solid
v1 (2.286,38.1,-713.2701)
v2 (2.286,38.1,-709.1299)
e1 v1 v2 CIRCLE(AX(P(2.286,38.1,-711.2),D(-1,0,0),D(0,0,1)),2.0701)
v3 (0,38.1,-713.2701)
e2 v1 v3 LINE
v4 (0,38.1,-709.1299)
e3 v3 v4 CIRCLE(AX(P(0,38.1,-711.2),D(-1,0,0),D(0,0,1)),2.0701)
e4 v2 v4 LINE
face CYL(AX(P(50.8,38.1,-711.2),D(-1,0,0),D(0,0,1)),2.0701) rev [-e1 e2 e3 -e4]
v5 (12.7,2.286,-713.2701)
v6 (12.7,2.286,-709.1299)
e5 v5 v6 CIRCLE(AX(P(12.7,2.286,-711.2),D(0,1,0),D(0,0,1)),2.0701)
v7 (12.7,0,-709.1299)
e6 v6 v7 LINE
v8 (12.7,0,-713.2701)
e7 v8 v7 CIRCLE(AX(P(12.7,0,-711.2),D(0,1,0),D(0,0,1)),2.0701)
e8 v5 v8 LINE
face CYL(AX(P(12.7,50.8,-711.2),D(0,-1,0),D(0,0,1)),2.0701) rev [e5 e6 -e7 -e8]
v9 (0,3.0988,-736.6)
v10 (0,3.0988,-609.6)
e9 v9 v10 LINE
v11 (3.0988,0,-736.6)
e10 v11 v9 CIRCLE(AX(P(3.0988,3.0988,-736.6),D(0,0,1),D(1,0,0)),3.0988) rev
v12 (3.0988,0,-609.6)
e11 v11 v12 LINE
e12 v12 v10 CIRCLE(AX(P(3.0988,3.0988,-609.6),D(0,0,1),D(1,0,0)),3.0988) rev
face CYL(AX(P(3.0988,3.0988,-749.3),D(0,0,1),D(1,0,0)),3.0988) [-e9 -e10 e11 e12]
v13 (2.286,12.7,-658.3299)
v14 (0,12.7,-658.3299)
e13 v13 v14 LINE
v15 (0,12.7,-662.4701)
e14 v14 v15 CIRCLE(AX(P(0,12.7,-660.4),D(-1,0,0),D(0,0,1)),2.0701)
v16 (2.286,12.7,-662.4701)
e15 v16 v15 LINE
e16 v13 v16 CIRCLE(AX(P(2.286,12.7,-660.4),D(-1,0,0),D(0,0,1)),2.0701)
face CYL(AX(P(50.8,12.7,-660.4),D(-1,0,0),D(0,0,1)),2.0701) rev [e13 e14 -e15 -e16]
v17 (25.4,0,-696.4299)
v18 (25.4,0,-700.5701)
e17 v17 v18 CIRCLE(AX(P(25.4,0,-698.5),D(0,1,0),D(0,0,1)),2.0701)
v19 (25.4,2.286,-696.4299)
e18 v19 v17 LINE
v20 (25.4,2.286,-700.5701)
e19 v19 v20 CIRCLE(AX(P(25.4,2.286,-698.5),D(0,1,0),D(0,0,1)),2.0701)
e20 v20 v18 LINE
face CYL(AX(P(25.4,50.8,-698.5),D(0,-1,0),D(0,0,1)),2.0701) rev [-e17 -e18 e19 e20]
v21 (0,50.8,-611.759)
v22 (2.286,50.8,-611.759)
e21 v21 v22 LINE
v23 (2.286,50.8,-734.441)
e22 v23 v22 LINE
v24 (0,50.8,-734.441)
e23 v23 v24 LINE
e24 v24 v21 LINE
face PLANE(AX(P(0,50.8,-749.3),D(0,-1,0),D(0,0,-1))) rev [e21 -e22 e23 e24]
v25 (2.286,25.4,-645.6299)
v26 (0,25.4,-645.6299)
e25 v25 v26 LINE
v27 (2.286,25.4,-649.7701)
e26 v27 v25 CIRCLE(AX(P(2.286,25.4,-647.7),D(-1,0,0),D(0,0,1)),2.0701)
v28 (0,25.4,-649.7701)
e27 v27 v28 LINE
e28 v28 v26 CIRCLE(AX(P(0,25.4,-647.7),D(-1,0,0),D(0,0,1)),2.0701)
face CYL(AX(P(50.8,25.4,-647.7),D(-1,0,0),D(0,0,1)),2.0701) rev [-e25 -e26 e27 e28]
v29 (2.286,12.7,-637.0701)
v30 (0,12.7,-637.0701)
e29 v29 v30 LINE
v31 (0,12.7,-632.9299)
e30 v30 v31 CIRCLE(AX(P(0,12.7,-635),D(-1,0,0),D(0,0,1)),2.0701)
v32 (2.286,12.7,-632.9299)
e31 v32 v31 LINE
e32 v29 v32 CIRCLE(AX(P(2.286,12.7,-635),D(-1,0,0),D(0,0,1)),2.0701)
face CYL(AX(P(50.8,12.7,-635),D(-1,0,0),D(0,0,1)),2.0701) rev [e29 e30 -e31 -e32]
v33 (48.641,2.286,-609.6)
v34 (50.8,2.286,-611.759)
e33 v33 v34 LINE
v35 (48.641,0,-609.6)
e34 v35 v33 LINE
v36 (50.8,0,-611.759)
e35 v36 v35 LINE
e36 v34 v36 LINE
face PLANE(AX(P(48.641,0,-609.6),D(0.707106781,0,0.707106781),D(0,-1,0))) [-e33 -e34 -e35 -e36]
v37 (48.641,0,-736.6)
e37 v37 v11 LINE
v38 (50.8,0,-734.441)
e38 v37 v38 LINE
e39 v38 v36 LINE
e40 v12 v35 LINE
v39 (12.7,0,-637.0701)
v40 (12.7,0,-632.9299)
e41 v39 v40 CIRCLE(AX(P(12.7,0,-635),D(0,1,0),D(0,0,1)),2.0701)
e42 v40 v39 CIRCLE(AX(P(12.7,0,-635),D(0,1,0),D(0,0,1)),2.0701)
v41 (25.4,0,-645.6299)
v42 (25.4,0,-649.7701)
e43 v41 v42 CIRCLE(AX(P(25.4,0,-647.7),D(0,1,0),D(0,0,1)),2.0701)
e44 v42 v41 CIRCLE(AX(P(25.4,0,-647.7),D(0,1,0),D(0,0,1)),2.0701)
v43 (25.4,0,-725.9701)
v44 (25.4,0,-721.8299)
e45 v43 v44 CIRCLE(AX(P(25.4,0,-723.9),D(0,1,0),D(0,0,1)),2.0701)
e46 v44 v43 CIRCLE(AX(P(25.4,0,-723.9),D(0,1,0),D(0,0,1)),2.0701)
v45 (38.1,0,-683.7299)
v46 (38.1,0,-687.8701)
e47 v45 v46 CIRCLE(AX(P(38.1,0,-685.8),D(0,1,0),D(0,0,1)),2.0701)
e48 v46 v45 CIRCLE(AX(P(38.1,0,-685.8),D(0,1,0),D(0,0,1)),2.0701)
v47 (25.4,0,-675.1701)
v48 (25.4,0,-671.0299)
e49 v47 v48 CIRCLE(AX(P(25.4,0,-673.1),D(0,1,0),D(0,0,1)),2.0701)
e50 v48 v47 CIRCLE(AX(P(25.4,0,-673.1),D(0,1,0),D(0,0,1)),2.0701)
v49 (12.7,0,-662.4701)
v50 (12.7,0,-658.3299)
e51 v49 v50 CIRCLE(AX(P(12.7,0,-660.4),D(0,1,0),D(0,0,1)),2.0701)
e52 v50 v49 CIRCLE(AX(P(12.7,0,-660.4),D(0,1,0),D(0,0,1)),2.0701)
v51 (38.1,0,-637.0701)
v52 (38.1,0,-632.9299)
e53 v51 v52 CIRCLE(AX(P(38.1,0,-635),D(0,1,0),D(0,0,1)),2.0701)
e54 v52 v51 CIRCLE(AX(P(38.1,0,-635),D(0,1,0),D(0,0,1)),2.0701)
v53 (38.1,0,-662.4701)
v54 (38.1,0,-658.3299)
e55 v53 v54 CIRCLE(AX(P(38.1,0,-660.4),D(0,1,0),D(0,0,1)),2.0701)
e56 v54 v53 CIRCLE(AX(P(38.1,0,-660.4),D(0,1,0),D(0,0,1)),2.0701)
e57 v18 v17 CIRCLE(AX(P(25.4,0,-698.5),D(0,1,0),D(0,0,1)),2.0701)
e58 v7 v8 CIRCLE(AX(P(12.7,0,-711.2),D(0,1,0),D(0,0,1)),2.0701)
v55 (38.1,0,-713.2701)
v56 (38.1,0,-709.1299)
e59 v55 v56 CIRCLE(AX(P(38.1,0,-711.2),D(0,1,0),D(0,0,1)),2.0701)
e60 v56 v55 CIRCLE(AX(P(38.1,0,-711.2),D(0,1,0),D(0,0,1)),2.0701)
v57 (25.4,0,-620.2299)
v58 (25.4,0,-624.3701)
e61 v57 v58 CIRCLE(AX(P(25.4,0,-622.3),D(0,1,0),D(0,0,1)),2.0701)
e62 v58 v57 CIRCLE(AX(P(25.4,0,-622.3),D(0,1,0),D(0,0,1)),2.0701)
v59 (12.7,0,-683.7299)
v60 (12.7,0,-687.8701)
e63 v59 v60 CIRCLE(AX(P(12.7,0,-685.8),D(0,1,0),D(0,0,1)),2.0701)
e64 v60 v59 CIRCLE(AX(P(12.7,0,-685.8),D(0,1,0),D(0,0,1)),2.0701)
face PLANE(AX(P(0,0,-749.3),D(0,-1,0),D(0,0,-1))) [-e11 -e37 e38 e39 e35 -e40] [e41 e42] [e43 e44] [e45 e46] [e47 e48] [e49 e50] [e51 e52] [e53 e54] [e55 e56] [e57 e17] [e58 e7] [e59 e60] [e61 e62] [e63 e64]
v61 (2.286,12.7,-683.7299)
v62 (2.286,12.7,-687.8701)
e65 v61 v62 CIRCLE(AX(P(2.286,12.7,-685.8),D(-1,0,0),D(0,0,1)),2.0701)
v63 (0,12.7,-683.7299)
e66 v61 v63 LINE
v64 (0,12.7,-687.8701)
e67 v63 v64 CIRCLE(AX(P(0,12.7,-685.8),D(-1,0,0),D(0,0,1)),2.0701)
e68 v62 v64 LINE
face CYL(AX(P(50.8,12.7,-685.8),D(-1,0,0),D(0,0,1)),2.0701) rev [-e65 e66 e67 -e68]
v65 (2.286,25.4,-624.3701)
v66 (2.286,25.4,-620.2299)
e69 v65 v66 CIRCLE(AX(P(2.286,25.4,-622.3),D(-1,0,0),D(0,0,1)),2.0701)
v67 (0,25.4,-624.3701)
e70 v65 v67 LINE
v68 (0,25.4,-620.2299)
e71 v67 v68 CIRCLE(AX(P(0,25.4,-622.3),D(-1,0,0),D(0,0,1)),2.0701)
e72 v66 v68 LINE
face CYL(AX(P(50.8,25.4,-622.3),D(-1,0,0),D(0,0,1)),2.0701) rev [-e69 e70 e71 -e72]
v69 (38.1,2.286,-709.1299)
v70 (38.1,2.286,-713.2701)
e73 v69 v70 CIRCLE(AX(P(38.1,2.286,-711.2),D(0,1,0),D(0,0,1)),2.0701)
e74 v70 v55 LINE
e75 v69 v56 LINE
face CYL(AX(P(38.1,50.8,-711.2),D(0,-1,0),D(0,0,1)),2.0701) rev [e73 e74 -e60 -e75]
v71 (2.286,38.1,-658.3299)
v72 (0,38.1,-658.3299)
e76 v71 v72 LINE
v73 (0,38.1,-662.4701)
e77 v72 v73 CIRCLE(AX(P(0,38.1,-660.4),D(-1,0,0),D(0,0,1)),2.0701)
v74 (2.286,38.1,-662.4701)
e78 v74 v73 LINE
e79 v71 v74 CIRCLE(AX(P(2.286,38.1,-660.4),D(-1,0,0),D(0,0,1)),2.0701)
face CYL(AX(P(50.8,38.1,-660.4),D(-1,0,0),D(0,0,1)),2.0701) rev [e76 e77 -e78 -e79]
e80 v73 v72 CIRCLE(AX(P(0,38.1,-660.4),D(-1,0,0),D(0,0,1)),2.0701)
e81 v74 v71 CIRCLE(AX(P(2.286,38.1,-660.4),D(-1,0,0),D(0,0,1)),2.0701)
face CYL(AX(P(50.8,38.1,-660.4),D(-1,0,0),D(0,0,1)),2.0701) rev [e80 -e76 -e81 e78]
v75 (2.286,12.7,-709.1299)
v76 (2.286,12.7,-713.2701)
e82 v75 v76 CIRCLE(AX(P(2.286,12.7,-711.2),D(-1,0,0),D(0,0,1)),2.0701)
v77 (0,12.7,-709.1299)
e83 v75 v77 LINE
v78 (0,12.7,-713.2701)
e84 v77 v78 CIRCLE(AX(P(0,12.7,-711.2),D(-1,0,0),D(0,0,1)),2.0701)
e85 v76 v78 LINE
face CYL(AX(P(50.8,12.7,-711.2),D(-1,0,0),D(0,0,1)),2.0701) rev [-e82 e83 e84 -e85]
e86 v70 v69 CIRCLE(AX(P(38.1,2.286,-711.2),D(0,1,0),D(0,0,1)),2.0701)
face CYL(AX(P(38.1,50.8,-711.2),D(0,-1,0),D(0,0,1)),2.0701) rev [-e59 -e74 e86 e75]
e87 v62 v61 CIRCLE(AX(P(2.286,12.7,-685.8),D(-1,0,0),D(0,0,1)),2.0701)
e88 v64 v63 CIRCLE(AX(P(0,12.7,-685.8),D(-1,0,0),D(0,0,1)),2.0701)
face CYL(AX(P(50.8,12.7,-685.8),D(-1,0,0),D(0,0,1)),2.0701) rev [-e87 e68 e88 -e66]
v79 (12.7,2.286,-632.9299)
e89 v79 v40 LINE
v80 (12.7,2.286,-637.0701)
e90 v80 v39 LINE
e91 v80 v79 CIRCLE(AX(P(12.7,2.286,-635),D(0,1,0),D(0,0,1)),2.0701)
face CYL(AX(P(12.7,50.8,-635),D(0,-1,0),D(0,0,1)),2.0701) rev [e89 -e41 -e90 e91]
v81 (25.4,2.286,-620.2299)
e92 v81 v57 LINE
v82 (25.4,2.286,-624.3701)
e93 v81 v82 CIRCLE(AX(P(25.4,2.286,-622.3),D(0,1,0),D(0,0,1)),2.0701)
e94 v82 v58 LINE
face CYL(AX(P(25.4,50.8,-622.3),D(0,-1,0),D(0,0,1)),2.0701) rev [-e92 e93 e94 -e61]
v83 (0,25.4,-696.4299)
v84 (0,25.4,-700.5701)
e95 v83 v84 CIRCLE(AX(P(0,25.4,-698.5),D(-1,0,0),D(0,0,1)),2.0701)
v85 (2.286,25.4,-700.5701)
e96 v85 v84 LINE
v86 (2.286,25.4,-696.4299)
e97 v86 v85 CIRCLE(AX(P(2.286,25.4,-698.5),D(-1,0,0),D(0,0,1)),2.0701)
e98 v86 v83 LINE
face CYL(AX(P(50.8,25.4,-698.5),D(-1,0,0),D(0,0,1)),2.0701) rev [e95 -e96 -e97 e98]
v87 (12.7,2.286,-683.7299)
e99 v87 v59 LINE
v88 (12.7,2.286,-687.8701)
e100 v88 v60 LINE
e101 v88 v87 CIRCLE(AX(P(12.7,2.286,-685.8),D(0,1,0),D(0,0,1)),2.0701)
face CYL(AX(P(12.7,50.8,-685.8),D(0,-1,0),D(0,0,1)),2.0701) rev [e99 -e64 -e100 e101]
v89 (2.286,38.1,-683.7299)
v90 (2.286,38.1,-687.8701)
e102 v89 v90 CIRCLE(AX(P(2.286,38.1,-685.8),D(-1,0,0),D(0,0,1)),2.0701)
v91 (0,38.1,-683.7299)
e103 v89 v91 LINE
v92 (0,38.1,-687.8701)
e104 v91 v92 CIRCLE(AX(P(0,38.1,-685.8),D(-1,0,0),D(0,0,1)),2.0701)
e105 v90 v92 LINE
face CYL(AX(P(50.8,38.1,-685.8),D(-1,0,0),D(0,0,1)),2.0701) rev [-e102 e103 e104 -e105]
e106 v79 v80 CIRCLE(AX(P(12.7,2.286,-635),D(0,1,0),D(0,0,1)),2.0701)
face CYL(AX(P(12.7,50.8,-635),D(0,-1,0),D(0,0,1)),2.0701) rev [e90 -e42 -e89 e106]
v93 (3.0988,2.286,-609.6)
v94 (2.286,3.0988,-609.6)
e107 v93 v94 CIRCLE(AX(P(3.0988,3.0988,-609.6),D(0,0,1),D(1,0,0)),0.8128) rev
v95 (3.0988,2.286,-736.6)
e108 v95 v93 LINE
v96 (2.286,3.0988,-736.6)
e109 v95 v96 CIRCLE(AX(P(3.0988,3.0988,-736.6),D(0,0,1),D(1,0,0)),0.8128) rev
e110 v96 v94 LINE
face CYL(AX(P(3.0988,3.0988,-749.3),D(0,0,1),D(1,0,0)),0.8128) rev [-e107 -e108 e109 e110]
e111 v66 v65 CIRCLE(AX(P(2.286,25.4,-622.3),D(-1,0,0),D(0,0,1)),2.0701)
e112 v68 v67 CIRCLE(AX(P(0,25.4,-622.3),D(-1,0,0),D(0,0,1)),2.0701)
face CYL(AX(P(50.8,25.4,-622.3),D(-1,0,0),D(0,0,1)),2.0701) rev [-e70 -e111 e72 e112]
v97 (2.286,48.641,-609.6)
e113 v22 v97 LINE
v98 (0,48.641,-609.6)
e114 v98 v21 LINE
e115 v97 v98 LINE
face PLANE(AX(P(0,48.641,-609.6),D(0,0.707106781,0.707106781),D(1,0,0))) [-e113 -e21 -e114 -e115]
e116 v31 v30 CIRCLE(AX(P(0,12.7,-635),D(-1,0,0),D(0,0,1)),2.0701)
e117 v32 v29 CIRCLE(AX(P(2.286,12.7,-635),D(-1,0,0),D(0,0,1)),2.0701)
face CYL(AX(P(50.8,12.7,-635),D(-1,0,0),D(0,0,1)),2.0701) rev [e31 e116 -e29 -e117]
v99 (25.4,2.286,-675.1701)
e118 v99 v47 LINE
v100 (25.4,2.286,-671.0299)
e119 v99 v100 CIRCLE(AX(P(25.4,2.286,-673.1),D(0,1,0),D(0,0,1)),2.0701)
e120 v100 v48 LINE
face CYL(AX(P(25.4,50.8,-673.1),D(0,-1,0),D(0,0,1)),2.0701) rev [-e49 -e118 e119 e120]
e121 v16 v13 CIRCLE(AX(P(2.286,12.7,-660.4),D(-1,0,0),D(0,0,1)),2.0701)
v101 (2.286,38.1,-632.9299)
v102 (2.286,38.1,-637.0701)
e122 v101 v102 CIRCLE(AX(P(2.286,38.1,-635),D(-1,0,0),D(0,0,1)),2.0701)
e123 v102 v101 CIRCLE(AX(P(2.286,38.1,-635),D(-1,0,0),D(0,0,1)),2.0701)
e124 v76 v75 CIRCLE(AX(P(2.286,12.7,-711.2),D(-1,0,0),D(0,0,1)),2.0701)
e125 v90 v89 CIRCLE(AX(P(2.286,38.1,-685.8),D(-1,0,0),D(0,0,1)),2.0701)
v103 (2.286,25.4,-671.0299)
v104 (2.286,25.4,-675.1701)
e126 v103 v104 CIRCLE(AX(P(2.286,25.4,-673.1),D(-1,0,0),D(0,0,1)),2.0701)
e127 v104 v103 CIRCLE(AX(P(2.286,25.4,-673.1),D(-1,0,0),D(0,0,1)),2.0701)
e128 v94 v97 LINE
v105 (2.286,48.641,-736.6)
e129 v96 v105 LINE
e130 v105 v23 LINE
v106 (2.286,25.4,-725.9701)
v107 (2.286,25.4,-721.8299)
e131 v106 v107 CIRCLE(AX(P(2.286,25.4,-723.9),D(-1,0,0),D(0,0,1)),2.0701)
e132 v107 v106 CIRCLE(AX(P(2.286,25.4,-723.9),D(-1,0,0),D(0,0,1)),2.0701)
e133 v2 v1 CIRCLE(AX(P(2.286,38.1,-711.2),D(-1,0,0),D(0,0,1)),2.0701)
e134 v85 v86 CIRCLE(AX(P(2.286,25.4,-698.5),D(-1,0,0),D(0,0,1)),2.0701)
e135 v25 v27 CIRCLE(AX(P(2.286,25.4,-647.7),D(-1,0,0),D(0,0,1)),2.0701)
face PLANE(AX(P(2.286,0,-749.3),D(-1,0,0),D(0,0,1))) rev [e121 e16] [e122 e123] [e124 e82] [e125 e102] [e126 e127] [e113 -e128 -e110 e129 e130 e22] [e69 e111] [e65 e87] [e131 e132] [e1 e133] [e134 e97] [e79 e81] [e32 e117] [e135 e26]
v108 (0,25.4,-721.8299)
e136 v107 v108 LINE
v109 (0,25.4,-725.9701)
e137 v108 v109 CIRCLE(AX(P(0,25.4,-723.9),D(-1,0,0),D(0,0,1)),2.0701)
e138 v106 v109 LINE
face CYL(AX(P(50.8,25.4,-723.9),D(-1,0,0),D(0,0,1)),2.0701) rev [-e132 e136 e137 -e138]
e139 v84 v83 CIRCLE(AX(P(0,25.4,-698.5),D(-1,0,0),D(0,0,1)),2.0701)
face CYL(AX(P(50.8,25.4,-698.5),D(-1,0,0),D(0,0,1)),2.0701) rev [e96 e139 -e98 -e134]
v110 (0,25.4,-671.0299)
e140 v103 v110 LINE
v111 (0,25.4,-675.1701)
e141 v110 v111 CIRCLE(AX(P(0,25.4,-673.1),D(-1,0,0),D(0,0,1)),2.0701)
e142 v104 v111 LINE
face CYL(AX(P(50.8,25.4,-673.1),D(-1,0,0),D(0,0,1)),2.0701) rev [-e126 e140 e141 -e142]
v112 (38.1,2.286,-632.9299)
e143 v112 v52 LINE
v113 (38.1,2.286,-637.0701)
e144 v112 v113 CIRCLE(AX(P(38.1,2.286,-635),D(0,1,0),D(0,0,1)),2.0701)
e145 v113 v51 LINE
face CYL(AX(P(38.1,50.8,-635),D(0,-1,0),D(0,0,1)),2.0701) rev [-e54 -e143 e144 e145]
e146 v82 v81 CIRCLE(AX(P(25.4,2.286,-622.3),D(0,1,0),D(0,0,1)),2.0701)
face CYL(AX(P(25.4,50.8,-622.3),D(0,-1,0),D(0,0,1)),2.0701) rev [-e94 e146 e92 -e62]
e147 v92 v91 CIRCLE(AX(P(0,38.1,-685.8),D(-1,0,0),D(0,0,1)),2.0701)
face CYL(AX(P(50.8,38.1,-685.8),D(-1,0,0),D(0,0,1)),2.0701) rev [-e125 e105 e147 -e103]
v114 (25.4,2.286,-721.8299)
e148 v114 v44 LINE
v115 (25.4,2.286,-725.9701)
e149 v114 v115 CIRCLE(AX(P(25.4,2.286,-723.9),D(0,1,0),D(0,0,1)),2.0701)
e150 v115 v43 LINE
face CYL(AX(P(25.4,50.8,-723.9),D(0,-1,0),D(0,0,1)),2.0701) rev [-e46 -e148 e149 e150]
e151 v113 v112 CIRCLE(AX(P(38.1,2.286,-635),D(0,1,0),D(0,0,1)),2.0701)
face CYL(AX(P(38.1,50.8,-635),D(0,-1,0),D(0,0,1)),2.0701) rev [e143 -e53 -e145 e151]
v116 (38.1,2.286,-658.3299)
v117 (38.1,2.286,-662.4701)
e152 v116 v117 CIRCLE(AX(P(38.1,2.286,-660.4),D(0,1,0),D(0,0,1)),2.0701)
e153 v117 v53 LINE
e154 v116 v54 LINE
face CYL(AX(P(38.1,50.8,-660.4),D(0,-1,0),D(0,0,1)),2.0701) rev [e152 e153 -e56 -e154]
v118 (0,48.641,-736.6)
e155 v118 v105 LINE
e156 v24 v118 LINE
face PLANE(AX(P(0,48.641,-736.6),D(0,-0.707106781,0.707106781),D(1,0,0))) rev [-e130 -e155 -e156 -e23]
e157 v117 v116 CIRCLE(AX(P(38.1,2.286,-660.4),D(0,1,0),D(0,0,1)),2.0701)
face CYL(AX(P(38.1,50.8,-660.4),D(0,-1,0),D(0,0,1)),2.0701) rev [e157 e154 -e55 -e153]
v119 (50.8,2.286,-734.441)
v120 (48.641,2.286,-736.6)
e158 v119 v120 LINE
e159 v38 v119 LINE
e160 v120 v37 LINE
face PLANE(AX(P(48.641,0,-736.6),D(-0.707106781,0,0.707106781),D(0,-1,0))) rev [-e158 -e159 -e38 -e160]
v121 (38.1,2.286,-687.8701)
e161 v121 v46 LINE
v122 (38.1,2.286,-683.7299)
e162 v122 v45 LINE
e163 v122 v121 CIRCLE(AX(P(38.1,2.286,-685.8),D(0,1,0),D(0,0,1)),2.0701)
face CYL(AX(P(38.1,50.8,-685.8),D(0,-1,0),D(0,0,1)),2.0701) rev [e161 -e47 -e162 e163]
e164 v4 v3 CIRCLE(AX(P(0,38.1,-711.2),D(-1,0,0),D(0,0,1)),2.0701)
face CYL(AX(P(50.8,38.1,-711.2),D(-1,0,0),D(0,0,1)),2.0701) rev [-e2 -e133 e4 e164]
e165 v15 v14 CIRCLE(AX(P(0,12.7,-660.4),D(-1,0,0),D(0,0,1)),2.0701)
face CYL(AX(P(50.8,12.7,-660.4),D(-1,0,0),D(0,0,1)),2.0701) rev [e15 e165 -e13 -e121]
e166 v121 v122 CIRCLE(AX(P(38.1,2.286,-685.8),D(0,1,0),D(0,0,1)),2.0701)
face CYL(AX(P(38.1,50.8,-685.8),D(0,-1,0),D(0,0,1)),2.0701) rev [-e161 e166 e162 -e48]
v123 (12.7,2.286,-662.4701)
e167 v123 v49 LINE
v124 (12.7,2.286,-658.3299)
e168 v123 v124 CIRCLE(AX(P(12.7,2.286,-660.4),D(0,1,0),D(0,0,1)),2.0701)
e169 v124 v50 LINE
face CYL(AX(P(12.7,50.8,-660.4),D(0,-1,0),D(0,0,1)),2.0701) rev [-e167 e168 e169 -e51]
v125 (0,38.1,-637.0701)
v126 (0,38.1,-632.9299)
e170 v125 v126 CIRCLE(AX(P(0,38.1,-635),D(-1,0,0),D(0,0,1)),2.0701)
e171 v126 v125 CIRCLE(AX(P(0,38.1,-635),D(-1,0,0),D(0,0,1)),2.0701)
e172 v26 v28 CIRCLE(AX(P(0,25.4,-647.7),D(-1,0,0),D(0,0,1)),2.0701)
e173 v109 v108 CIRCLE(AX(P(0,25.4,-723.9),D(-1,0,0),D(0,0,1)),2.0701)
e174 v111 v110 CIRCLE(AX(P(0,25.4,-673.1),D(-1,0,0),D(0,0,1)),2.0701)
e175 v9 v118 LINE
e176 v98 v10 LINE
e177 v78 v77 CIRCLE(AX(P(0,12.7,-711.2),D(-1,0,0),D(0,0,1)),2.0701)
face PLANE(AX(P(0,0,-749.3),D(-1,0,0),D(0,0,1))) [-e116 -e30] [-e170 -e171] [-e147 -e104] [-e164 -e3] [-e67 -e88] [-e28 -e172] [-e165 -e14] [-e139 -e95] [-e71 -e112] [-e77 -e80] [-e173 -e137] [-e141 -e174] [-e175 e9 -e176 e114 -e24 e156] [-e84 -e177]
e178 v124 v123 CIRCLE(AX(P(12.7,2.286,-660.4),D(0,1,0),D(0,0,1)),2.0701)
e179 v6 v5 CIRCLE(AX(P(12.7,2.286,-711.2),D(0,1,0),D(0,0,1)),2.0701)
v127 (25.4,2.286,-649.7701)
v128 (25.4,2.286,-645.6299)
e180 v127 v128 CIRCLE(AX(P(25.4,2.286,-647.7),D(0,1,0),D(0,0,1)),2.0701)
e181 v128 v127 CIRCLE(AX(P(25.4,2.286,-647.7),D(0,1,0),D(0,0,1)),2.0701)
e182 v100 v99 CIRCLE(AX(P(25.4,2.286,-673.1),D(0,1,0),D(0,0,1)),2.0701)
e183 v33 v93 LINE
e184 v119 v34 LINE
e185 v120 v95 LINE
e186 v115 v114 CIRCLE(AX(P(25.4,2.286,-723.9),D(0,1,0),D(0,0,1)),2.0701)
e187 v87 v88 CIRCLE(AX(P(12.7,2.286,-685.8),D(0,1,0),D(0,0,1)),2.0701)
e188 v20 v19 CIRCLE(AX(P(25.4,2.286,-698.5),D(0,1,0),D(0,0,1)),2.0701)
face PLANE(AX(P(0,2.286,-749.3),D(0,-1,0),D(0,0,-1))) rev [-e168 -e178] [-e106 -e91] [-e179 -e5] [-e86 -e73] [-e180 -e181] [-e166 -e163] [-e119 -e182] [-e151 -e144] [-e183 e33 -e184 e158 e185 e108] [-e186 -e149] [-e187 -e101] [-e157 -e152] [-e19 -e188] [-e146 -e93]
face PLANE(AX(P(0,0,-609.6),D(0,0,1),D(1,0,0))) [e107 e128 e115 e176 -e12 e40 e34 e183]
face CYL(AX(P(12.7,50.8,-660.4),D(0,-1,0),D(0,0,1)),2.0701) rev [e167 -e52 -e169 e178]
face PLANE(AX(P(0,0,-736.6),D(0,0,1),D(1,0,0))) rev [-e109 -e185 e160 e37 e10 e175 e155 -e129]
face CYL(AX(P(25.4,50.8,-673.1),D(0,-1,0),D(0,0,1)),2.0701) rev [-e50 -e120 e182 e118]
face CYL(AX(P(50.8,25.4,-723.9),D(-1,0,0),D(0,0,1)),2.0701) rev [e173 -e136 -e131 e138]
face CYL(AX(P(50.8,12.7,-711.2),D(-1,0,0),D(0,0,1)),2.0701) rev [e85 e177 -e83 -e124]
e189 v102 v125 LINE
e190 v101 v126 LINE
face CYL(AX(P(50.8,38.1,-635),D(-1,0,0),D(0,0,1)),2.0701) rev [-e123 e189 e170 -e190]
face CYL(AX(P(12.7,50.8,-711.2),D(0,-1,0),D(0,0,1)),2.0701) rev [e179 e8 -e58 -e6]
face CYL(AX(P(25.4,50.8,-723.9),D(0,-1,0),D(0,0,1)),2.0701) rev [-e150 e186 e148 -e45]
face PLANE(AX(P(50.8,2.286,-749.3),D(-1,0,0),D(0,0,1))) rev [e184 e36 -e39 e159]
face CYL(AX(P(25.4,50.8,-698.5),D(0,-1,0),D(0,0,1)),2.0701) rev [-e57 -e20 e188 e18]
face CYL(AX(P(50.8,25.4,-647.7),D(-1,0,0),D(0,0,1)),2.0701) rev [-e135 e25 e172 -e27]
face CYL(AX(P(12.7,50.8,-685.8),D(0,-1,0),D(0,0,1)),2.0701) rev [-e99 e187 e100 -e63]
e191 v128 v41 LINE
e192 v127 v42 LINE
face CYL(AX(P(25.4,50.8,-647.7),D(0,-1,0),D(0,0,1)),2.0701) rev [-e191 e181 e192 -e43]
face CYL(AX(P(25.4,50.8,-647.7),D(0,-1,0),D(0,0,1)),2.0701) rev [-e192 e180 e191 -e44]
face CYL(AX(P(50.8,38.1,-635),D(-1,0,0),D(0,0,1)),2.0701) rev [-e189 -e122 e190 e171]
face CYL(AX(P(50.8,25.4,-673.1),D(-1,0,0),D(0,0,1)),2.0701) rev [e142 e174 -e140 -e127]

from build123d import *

# Parameters (mm, degrees)
CUT_EXTRUDE1_OUTLINE_R   = 2.0701
CUT_EXTRUDE1_DEPTH       = 3.0988
CUT_EXTRUDE1_START       = 2.286
CUT_EXTRUDE1_2_OUTLINE_W = 2.286
CUT_EXTRUDE1_2_OUTLINE_H = 152.4
CUT_EXTRUDE1_2_DEPTH     = 48.514
CUT_EXTRUDE1_START_2     = 3.0988
CUT_EXTRUDE1_3_OUTLINE_W = 0.8128
CUT_EXTRUDE1_3_OUTLINE_H = 152.4
CUT_EXTRUDE1_3_DEPTH     = 47.7012
CUT_EXTRUDE1_4_OUTLINE_R = 2.0701
CUT_EXTRUDE1_4_DEPTH     = 2.286
CUT_EXTRUDE1_START_3     = -749.3
CUT_EXTRUDE1_5_DEPTH     = 152.4
CUT_EXTRUDE1_START_4     = 564.229492087
CUT_EXTRUDE1_6_OUTLINE_W = 5
CUT_EXTRUDE1_6_OUTLINE_H = 6
CUT_EXTRUDE1_6_DEPTH     = 2.770507913
CHAMFER1_SIZE            = 2.159
BOSS_EXTRUDE1_START      = -2.286
BOSS_EXTRUDE1_DEPTH      = 2.286
BOSS_EXTRUDE2_START      = -2.286
BOSS_EXTRUDE2_DEPTH      = 2.286
SKETCH4_W                = 50.8
SKETCH4_H                = 50.8
CUT_EXTRUDE2_DEPTH       = 12.7
SKETCH5_W                = 50.8
SKETCH5_H                = 50.8
CUT_EXTRUDE3_DEPTH       = 12.7
BOSS_EXTRUDE3_START      = -2.286
BOSS_EXTRUDE3_DEPTH      = 2.286
BOSS_EXTRUDE4_START      = -2.286
BOSS_EXTRUDE4_DEPTH      = 2.286
CHAMFER2_SIZE            = 2.159


with BuildPart() as part:
    # Cut-Extrude1: read off the stored shape, not the designer's step
    # Cut-Extrude1 outline → Cut-Extrude1 (new body)
    with BuildSketch(Plane(origin=(0, 0, 0), x_dir=(1, 0, 0), z_dir=(0, 1, 0))):
        with BuildLine():
            ThreePointArc((23.3299, 596.9), (23.936218252, 598.363781748), (25.4, 598.9701))
            ThreePointArc((25.4, 598.9701), (26.863781748, 598.363781748), (27.4701, 596.9))
            Line((27.4701, 596.9), (50.8, 596.9))
            Line((50.8, 596.9), (50.8, 747.141))
            Line((50.8, 747.141), (48.641, 749.3))
            Line((48.641, 749.3), (0, 749.3))
            Line((0, 749.3), (0, 596.9))
            Line((0, 596.9), (23.3299, 596.9))
        make_face()
        with Locations((12.7, 609.6)):
            Circle(CUT_EXTRUDE1_OUTLINE_R, mode=Mode.SUBTRACT)
        with Locations((25.4, 622.3)):
            Circle(CUT_EXTRUDE1_OUTLINE_R, mode=Mode.SUBTRACT)
        with Locations((12.7, 635)):
            Circle(CUT_EXTRUDE1_OUTLINE_R, mode=Mode.SUBTRACT)
        with Locations((12.7, 660.4)):
            Circle(CUT_EXTRUDE1_OUTLINE_R, mode=Mode.SUBTRACT)
        with Locations((25.4, 647.7)):
            Circle(CUT_EXTRUDE1_OUTLINE_R, mode=Mode.SUBTRACT)
        with Locations((38.1, 609.6)):
            Circle(CUT_EXTRUDE1_OUTLINE_R, mode=Mode.SUBTRACT)
        with Locations((38.1, 635)):
            Circle(CUT_EXTRUDE1_OUTLINE_R, mode=Mode.SUBTRACT)
        with Locations((38.1, 660.4)):
            Circle(CUT_EXTRUDE1_OUTLINE_R, mode=Mode.SUBTRACT)
        with Locations((12.7, 685.8)):
            Circle(CUT_EXTRUDE1_OUTLINE_R, mode=Mode.SUBTRACT)
        with Locations((25.4, 673.1)):
            Circle(CUT_EXTRUDE1_OUTLINE_R, mode=Mode.SUBTRACT)
        with Locations((25.4, 698.5)):
            Circle(CUT_EXTRUDE1_OUTLINE_R, mode=Mode.SUBTRACT)
        with Locations((12.7, 711.2)):
            Circle(CUT_EXTRUDE1_OUTLINE_R, mode=Mode.SUBTRACT)
        with Locations((12.7, 736.6)):
            Circle(CUT_EXTRUDE1_OUTLINE_R, mode=Mode.SUBTRACT)
        with Locations((25.4, 723.9)):
            Circle(CUT_EXTRUDE1_OUTLINE_R, mode=Mode.SUBTRACT)
        with Locations((38.1, 685.8)):
            Circle(CUT_EXTRUDE1_OUTLINE_R, mode=Mode.SUBTRACT)
        with Locations((38.1, 711.2)):
            Circle(CUT_EXTRUDE1_OUTLINE_R, mode=Mode.SUBTRACT)
        with Locations((38.1, 736.6)):
            Circle(CUT_EXTRUDE1_OUTLINE_R, mode=Mode.SUBTRACT)
    extrude(amount=CUT_EXTRUDE1_DEPTH)

    # Cut-Extrude1 2 outline → Cut-Extrude1 2 (add)
    with BuildSketch(Plane(origin=(0, 0, 0), x_dir=(1, 0, 0), z_dir=(0, 1, 0)).offset(CUT_EXTRUDE1_START)):
        with Locations((1.143, 673.1)):
            Rectangle(CUT_EXTRUDE1_2_OUTLINE_W, CUT_EXTRUDE1_2_OUTLINE_H)
    extrude(amount=CUT_EXTRUDE1_2_DEPTH)

    # Cut-Extrude1 3 outline → Cut-Extrude1 3 (cut)
    with BuildSketch(Plane.YZ.offset(CUT_EXTRUDE1_START_2)):
        with Locations((2.6924, -673.1)):
            Rectangle(CUT_EXTRUDE1_3_OUTLINE_W, CUT_EXTRUDE1_3_OUTLINE_H)
    extrude(amount=CUT_EXTRUDE1_3_DEPTH, mode=Mode.SUBTRACT)

    # Cut-Extrude1 4 outline → Cut-Extrude1 4 (cut)
    with BuildSketch(Plane.YZ):
        with BuildLine():
            ThreePointArc((23.3299, -596.9), (23.936218252, -598.363781748), (25.4, -598.9701))
            ThreePointArc((25.4, -598.9701), (26.863781748, -598.363781748), (27.4701, -596.9))
            Line((27.4701, -596.9), (23.3299, -596.9))
        make_face()
        with Locations((25.4, -723.9)):
            Circle(CUT_EXTRUDE1_4_OUTLINE_R)
        with Locations((25.4, -698.5)):
            Circle(CUT_EXTRUDE1_4_OUTLINE_R)
        with Locations((25.4, -673.1)):
            Circle(CUT_EXTRUDE1_4_OUTLINE_R)
        with Locations((25.4, -647.7)):
            Circle(CUT_EXTRUDE1_4_OUTLINE_R)
        with Locations((25.4, -622.3)):
            Circle(CUT_EXTRUDE1_4_OUTLINE_R)
        with Locations((12.7, -736.6)):
            Circle(CUT_EXTRUDE1_4_OUTLINE_R)
        with Locations((12.7, -711.2)):
            Circle(CUT_EXTRUDE1_4_OUTLINE_R)
        with Locations((12.7, -685.8)):
            Circle(CUT_EXTRUDE1_4_OUTLINE_R)
        with Locations((12.7, -660.4)):
            Circle(CUT_EXTRUDE1_4_OUTLINE_R)
        with Locations((12.7, -635)):
            Circle(CUT_EXTRUDE1_4_OUTLINE_R)
        with Locations((12.7, -609.6)):
            Circle(CUT_EXTRUDE1_4_OUTLINE_R)
        with Locations((38.1, -736.6)):
            Circle(CUT_EXTRUDE1_4_OUTLINE_R)
        with Locations((38.1, -711.2)):
            Circle(CUT_EXTRUDE1_4_OUTLINE_R)
        with Locations((38.1, -685.8)):
            Circle(CUT_EXTRUDE1_4_OUTLINE_R)
        with Locations((38.1, -660.4)):
            Circle(CUT_EXTRUDE1_4_OUTLINE_R)
        with Locations((38.1, -635)):
            Circle(CUT_EXTRUDE1_4_OUTLINE_R)
        with Locations((38.1, -609.6)):
            Circle(CUT_EXTRUDE1_4_OUTLINE_R)
    extrude(amount=CUT_EXTRUDE1_4_DEPTH, mode=Mode.SUBTRACT)

    # Cut-Extrude1 5 outline → Cut-Extrude1 5 (cut)
    with BuildSketch(Plane.XY.offset(CUT_EXTRUDE1_START_3)):
        with BuildLine():
            ThreePointArc((3.0988, 0), (0.907617506, 0.907617506), (0, 3.0988))
            Line((0, 3.0988), (2.4e-08, 50))
            Line((2.4e-08, 50), (-1, 50))
            Line((-1, 50), (-1, -1))
            Line((-1, -1), (5, -1))
            Line((5, -1), (5, 1e-09))
            Line((5, 1e-09), (3.0988, 0))
        make_face()
        with BuildLine():
            Line((3.0988, 3.0988), (2.286, 3.0988))
            ThreePointArc((2.286, 3.0988), (2.524063608, 2.524063608), (3.0988, 2.286))
            Line((3.0988, 2.286), (3.0988, 3.0988))
        make_face()
    extrude(amount=CUT_EXTRUDE1_5_DEPTH, mode=Mode.SUBTRACT)

    # Cut-Extrude1 6 outline → Cut-Extrude1 6 (cut)
    with BuildSketch(Plane(origin=(0, 0, 0), x_dir=(1, 0, 0), z_dir=(0, 0.7071067811865511, -0.7071067811865441)).offset(CUT_EXTRUDE1_START_4)):
        with Locations((1.5, 494)):
            Rectangle(CUT_EXTRUDE1_6_OUTLINE_W, CUT_EXTRUDE1_6_OUTLINE_H)
    extrude(amount=CUT_EXTRUDE1_6_DEPTH, mode=Mode.SUBTRACT)

    # Chamfer1
    chamfer1_edges = [part.edges().sort_by_distance(p)[0] for p in [
        (1.143, 50.8, -596.9),
        (50.8, 1.143, -596.9),
    ]]
    chamfer(chamfer1_edges, length=CHAMFER1_SIZE)

    # Sketch2 → Boss-Extrude1 (add)
    with BuildSketch(Plane(origin=(2.286, 0, 0), x_dir=(0, 0, -1), z_dir=(1, 0, 0)).offset(BOSS_EXTRUDE1_START)):
        with BuildLine():
            Line((596.9, 27.4701), (596.9, 23.3299))
            ThreePointArc((596.9, 23.3299), (598.9701, 25.4), (596.9, 27.4701))
        make_face()
    extrude(amount=BOSS_EXTRUDE1_DEPTH)

    # Sketch3 → Boss-Extrude2 (add)
    with BuildSketch(Plane(origin=(0, 2.286, 0), x_dir=(1, 0, 0), z_dir=(0, 1, 0)).offset(BOSS_EXTRUDE2_START)):
        with BuildLine():
            Line((27.4701, 596.9), (23.3299, 596.9))
            ThreePointArc((23.3299, 596.9), (25.4, 598.9701), (27.4701, 596.9))
        make_face()
    extrude(amount=BOSS_EXTRUDE2_DEPTH)

    # Sketch4 → Cut-Extrude2 (cut)
    with BuildSketch(Plane.XY.offset(-596.9)):
        with Locations((25.4, 25.4)):
            Rectangle(SKETCH4_W, SKETCH4_H)
    extrude(amount=-CUT_EXTRUDE2_DEPTH, mode=Mode.SUBTRACT)

    # Sketch5 → Cut-Extrude3 (cut)
    with BuildSketch(Plane(origin=(0, 0, -749.3), x_dir=(-1, 0, 0), z_dir=(0, 0, -1))):
        with Locations((-25.4, 25.4)):
            Rectangle(SKETCH5_W, SKETCH5_H)
    extrude(amount=-CUT_EXTRUDE3_DEPTH, mode=Mode.SUBTRACT)

    # Sketch6 → Boss-Extrude3 (add)
    with BuildSketch(Plane(origin=(0, 2.286, 0), x_dir=(1, 0, 0), z_dir=(0, 1, 0)).offset(BOSS_EXTRUDE3_START)):
        with BuildLine():
            Line((40.1701, 609.6), (36.0299, 609.6))
            ThreePointArc((36.0299, 609.6), (36.636218252, 611.063781748), (38.1, 611.6701))
            ThreePointArc((38.1, 611.6701), (39.563781748, 611.063781748), (40.1701, 609.6))
        make_face()
        with BuildLine():
            Line((14.7701, 609.6), (10.6299, 609.6))
            ThreePointArc((10.6299, 609.6), (11.236218252, 611.063781748), (12.7, 611.6701))
            ThreePointArc((12.7, 611.6701), (14.163781748, 611.063781748), (14.7701, 609.6))
        make_face()
        with BuildLine():
            Line((40.1701, 736.6), (36.0299, 736.6))
            ThreePointArc((36.0299, 736.6), (36.636218252, 735.136218252), (38.1, 734.5299))
            ThreePointArc((38.1, 734.5299), (39.563781748, 735.136218252), (40.1701, 736.6))
        make_face()
        with BuildLine():
            Line((14.7701, 736.6), (10.6299, 736.6))
            ThreePointArc((10.6299, 736.6), (11.236218252, 735.136218252), (12.7, 734.5299))
            ThreePointArc((12.7, 734.5299), (14.163781748, 735.136218252), (14.7701, 736.6))
        make_face()
    extrude(amount=BOSS_EXTRUDE3_DEPTH)

    # Sketch7 → Boss-Extrude4 (add)
    with BuildSketch(Plane(origin=(2.286, 0, 0), x_dir=(0, 0, -1), z_dir=(1, 0, 0)).offset(BOSS_EXTRUDE4_START)):
        with BuildLine():
            Line((736.6, 10.6299), (736.6, 14.7701))
            ThreePointArc((736.6, 14.7701), (735.136218252, 14.163781748), (734.5299, 12.7))
            ThreePointArc((734.5299, 12.7), (735.136218252, 11.236218252), (736.6, 10.6299))
        make_face()
        with BuildLine():
            Line((736.6, 36.0299), (736.6, 40.1701))
            ThreePointArc((736.6, 40.1701), (735.136218252, 39.563781748), (734.5299, 38.1))
            ThreePointArc((734.5299, 38.1), (735.136218252, 36.636218252), (736.6, 36.0299))
        make_face()
        with BuildLine():
            Line((609.6, 10.6299), (609.6, 14.7701))
            ThreePointArc((609.6, 14.7701), (611.063781748, 14.163781748), (611.6701, 12.7))
            ThreePointArc((611.6701, 12.7), (611.063781748, 11.236218252), (609.6, 10.6299))
        make_face()
        with BuildLine():
            Line((609.6, 36.0299), (609.6, 40.1701))
            ThreePointArc((609.6, 40.1701), (611.063781748, 39.563781748), (611.6701, 38.1))
            ThreePointArc((611.6701, 38.1), (611.063781748, 36.636218252), (609.6, 36.0299))
        make_face()
    extrude(amount=BOSS_EXTRUDE4_DEPTH)

    # Chamfer2
    chamfer2_edges = [part.edges().sort_by_distance(p)[0] for p in [
        (50.8, 1.143, -609.6),
        (1.143, 50.8, -609.6),
        (1.143, 50.8, -736.6),
        (50.8, 1.143, -736.6),
    ]]
    chamfer(chamfer2_edges, length=CHAMFER2_SIZE)


solid = part.part
